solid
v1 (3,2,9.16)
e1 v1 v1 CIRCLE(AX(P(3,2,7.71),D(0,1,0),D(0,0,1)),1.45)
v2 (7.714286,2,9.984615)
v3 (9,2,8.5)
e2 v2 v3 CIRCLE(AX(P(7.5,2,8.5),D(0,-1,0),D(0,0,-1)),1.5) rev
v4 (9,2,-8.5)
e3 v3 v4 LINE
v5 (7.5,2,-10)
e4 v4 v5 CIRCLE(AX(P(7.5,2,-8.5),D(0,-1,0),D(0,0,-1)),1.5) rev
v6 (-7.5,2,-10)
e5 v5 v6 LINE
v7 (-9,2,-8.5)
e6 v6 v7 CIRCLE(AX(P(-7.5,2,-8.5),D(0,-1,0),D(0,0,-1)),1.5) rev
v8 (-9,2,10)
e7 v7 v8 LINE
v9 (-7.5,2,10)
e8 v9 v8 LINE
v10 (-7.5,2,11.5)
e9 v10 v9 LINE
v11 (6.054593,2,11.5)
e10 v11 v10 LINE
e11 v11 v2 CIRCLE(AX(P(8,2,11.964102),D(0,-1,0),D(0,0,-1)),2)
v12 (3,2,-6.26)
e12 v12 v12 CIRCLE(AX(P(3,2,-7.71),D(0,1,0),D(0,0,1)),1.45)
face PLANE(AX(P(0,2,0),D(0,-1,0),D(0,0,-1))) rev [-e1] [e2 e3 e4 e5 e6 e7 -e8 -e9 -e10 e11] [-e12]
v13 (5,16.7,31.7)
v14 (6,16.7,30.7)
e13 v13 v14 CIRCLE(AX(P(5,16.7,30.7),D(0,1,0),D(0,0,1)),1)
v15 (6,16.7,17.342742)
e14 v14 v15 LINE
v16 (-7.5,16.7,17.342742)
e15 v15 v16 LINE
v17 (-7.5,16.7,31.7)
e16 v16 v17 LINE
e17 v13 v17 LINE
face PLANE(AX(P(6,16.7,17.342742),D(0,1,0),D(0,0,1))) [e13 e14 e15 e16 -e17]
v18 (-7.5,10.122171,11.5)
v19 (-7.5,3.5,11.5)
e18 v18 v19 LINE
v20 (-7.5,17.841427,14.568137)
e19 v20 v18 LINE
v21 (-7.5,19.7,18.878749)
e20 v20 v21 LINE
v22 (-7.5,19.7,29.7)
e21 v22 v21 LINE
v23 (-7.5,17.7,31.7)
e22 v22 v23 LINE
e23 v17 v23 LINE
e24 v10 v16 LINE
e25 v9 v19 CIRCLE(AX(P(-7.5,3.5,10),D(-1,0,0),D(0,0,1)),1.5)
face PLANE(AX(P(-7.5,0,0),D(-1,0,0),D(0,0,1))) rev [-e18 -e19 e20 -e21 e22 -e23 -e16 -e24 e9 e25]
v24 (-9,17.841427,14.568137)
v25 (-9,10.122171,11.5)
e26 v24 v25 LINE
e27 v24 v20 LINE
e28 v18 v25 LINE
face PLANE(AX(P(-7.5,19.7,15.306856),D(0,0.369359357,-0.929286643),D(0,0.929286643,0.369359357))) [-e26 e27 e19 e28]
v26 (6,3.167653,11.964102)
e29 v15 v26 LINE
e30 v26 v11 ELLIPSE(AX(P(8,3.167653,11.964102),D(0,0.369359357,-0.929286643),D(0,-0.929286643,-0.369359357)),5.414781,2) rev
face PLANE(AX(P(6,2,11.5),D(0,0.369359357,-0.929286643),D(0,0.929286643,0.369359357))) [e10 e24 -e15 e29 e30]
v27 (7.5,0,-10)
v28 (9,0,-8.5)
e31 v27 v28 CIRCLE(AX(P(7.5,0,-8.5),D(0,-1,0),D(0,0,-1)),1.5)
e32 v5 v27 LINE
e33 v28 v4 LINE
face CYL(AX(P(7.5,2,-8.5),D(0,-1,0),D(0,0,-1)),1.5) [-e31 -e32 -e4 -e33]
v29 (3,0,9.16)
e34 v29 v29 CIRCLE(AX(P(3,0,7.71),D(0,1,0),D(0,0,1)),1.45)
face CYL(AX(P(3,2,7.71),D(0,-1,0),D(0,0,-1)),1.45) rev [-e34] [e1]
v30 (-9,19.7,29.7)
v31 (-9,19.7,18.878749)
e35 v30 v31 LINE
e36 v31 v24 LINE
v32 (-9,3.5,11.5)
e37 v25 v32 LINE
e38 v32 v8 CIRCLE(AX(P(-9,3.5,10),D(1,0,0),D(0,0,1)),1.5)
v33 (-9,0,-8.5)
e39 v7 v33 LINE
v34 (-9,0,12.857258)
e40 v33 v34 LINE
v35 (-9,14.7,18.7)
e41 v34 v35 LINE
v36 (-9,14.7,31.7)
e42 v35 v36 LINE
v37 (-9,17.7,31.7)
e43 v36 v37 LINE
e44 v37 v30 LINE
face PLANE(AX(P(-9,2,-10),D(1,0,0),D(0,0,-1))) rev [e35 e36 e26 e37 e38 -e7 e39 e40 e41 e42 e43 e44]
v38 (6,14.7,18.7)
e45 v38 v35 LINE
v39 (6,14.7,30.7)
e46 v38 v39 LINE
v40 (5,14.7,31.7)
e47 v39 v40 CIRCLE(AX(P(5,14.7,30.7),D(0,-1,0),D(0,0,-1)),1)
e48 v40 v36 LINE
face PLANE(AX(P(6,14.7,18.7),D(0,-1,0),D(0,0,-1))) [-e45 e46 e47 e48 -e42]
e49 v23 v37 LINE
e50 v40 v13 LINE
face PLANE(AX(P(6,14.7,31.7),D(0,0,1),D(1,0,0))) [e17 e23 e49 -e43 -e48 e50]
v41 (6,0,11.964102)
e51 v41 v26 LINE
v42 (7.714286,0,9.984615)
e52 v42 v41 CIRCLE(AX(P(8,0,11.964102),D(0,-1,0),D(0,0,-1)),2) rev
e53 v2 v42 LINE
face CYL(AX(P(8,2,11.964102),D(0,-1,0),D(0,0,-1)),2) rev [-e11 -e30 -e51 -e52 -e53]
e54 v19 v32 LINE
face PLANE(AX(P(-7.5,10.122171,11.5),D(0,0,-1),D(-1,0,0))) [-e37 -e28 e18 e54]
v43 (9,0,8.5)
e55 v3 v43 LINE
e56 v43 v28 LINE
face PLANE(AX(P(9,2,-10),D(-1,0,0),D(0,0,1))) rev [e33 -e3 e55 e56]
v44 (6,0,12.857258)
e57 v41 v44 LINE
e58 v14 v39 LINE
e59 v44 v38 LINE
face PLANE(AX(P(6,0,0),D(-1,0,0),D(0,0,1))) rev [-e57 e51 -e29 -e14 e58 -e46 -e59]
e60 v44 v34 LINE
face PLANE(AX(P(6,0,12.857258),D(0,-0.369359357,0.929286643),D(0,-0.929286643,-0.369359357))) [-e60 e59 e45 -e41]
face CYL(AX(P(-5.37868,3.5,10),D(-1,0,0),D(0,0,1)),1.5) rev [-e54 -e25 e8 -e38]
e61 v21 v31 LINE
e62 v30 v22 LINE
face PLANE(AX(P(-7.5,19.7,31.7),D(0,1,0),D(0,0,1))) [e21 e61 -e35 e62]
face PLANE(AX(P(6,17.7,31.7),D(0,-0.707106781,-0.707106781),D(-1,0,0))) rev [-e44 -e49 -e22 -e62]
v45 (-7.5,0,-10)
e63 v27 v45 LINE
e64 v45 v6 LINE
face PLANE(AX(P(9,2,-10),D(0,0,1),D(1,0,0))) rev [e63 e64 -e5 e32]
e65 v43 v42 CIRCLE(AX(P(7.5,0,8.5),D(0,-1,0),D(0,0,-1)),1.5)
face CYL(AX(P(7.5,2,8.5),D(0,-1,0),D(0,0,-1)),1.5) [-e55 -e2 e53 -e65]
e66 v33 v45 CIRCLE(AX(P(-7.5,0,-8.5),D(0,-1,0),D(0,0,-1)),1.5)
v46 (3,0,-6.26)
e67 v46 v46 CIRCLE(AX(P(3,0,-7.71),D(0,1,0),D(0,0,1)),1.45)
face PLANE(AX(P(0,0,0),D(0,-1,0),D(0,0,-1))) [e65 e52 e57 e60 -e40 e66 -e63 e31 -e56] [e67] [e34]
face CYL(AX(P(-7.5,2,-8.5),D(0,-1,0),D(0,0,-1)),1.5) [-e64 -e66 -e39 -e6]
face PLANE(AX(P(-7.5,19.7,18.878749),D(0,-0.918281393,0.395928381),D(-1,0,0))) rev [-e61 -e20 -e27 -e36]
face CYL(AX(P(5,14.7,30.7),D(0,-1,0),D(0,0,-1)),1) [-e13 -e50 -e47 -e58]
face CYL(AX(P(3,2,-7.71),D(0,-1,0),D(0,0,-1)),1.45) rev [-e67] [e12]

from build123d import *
from OCP.BRepFilletAPI import BRepFilletAPI_MakeChamfer

# Parameters (mm, degrees)
SKETCH1_W           = 18
SKETCH1_H           = 20
SKETCH1_R           = 1.45
BOSS_EXTRUDE1_DEPTH = 2
BOSS_EXTRUDE2_DEPTH = 15
BOSS_EXTRUDE4_DEPTH = 1.5
CHAMFER1_SIZE       = 2
CHAMFER1_SIZE2      = 3.571892366
FILLET1_R           = 1.5
FILLET2_R           = 1
FILLET3_R           = 2
FILLET_2_DEPTH      = 1.5


with BuildPart() as part:
    # Sketch1 → Boss-Extrude1 (new body)
    with BuildSketch(Plane(origin=(0, 0, 0), x_dir=(1, 0, 0), z_dir=(0, 1, 0))):
        Rectangle(SKETCH1_W, SKETCH1_H)
        with Locations(Location((3, 7.71, 0), (0, 0, 270))):
            Circle(SKETCH1_R, mode=Mode.SUBTRACT)
        with Locations(Location((3, -7.71, 0), (0, 0, 270))):
            Circle(SKETCH1_R, mode=Mode.SUBTRACT)
    extrude(amount=BOSS_EXTRUDE1_DEPTH)

    # Sketch2 → Boss-Extrude2 (add)
    with BuildSketch(Plane.ZY.offset(9)):
        Polygon((10, 2), (11.5, 2), (17.342742479, 16.7), (31.7, 16.7), (31.7, 14.7), (18.7, 14.7), (12.857257521, 0), (10, 0), align=None)
    extrude(amount=-BOSS_EXTRUDE2_DEPTH)

    # Sketch4 → Boss-Extrude4 (add)
    with BuildSketch(Plane.ZY.offset(9)):
        Polygon((31.7, 16.7), (17.342742479, 16.7), (11.5, 2), (11.5, 10.122171388), (15.306856196, 19.7), (31.7, 19.7), align=None)
    extrude(amount=-BOSS_EXTRUDE4_DEPTH)

    # Chamfer1: one chamfer whose edges measure the first distance from different faces: ONE call of the kernel's chamfer builder (chamfer() names one face for all edges)
    chamfer1_edges_1 = [part.edges().sort_by_distance(p)[0] for p in [
        (-8.25, 19.7, 31.7),
    ]]
    chamfer1_edges_2 = [part.edges().sort_by_distance(p)[0] for p in [
        (-8.25, 19.7, 15.306856196),
    ]]
    chamfer1_side_2 = [part.faces().sort_by_distance(p)[0] for p in [
        (-8.25, 14.911085694, 13.403428098),
    ]]
    chamfer1 = BRepFilletAPI_MakeChamfer(part.part.solid().wrapped)
    for e in chamfer1_edges_1:
        chamfer1.Add(CHAMFER1_SIZE, e.wrapped)
    for e in chamfer1_edges_2:
        chamfer1.Add(CHAMFER1_SIZE, CHAMFER1_SIZE2, e.wrapped, chamfer1_side_2[0].wrapped)  # the first distance lies on this face
    add(Compound.cast(chamfer1.Shape()), mode=Mode.REPLACE)

    # Fillet1
    fillet1_edges = [part.edges().sort_by_distance(p)[0] for p in [
        (-9, 1, -10),
        (9, 1, -10),
        (9, 1, 10),
    ]]
    fillet(fillet1_edges, radius=FILLET1_R)

    # Fillet2
    fillet2_edges = [part.edges().sort_by_distance(p)[0] for p in [
        (6, 15.7, 31.7),
    ]]
    fillet(fillet2_edges, radius=FILLET2_R)

    # Fillet3
    # the kernel refuses this fillet: 2 mm, written as the material it adds along each edge
    with BuildSketch(Plane(origin=(6, 0, 10), x_dir=(0, 0, 1), z_dir=(0, 1, 0))) as fillet3_piece_1_section:
        with BuildLine():
            CenterArc((1.964101615, 2), FILLET3_R, 188.213210702, 81.786789298)
            Line((-0.015385022, 1.714285714), (-0.213333686, 1.685714286))
            ThreePointArc((-0.213333686, 1.685714286), (-0.2, 1.5), (-0.2, 0))
            Line((-0.2, 0), (0, -0.2))
            Line((0, -0.2), (1.964101615, -0.2))
            Line((1.964101615, -0.2), (1.964101615, 0))
        make_face()
    fillet3_piece_1 = extrude(amount=2, mode=Mode.PRIVATE)
    fillet3_piece_1 = split(fillet3_piece_1, bisect_by=Plane(origin=(5.952622656, 0.913834891, 11.068286869), z_dir=(0, -0.3693593568576952, 0.929286643346212)), keep=Keep.TOP, mode=Mode.PRIVATE)
    add(fillet3_piece_1)
    with BuildSketch(Plane(origin=(6, 0, 10), x_dir=(0, 0, 1), z_dir=(0, 1, 0))) as fillet3_piece_2_section:
        with BuildLine():
            CenterArc((1.964101615, 2), FILLET3_R, 188.213210702, 81.786789298)
            Line((-0.015385022, 1.714285714), (-0.213333686, 1.685714286))
            ThreePointArc((-0.213333686, 1.685714286), (-0.2, 1.5), (-0.2, 0))
            Line((-0.2, 0), (0, -0.2))
            Line((0, -0.2), (1.964101615, -0.2))
            Line((1.964101615, -0.2), (1.964101615, 0))
        make_face()
    fillet3_piece_2 = extrude(amount=2, mode=Mode.PRIVATE)
    fillet3_piece_2 = split(fillet3_piece_2, bisect_by=Plane(origin=(6.444718366, 0.756232919, 11.005645527), z_dir=(0, 0.3693593568576952, -0.929286643346212)), keep=Keep.TOP, mode=Mode.PRIVATE)
    add(fillet3_piece_2)
    with BuildSketch(Plane(origin=(6, 0, 10), x_dir=(0, 0, 1), z_dir=(0, 1, 0))) as fillet3_piece_3_section:
        with BuildLine():
            CenterArc((1.964101615, 2), FILLET3_R, 188.213210702, 81.786789298)
            Line((-0.015385022, 1.714285714), (-0.213333686, 1.685714286))
            ThreePointArc((-0.213333686, 1.685714286), (-0.2, 1.5), (-0.2, 0))
            Line((-0.2, 0), (0, -0.2))
            Line((0, -0.2), (1.964101615, -0.2))
            Line((1.964101615, -0.2), (1.964101615, 0))
        make_face()
    fillet3_piece_3 = extrude(amount=6.910254038, mode=Mode.PRIVATE)
    fillet3_piece_3 = split(fillet3_piece_3, bisect_by=Plane(origin=(5.904786251, 2.434661137, 11.672762795), z_dir=(0, -0.3693593568576952, 0.929286643346212)), keep=Keep.TOP, mode=Mode.PRIVATE)
    fillet3_piece_3 = split(fillet3_piece_3, bisect_by=Plane(origin=(5.904786251, 2, 11.804045744), z_dir=(0, 1, 0)), keep=Keep.TOP, mode=Mode.PRIVATE)
    add(fillet3_piece_3)

    # Sketch5 → Fillet 2 (add)
    with BuildSketch(Plane.ZY.offset(9)):
        with BuildLine():
            Line((10, 2), (11.5, 2))
            Line((11.5, 2), (11.5, 3.5))
            ThreePointArc((11.5, 3.5), (11.060660172, 2.439339828), (10, 2))
        make_face()
    extrude(amount=-FILLET_2_DEPTH)


solid = part.part
